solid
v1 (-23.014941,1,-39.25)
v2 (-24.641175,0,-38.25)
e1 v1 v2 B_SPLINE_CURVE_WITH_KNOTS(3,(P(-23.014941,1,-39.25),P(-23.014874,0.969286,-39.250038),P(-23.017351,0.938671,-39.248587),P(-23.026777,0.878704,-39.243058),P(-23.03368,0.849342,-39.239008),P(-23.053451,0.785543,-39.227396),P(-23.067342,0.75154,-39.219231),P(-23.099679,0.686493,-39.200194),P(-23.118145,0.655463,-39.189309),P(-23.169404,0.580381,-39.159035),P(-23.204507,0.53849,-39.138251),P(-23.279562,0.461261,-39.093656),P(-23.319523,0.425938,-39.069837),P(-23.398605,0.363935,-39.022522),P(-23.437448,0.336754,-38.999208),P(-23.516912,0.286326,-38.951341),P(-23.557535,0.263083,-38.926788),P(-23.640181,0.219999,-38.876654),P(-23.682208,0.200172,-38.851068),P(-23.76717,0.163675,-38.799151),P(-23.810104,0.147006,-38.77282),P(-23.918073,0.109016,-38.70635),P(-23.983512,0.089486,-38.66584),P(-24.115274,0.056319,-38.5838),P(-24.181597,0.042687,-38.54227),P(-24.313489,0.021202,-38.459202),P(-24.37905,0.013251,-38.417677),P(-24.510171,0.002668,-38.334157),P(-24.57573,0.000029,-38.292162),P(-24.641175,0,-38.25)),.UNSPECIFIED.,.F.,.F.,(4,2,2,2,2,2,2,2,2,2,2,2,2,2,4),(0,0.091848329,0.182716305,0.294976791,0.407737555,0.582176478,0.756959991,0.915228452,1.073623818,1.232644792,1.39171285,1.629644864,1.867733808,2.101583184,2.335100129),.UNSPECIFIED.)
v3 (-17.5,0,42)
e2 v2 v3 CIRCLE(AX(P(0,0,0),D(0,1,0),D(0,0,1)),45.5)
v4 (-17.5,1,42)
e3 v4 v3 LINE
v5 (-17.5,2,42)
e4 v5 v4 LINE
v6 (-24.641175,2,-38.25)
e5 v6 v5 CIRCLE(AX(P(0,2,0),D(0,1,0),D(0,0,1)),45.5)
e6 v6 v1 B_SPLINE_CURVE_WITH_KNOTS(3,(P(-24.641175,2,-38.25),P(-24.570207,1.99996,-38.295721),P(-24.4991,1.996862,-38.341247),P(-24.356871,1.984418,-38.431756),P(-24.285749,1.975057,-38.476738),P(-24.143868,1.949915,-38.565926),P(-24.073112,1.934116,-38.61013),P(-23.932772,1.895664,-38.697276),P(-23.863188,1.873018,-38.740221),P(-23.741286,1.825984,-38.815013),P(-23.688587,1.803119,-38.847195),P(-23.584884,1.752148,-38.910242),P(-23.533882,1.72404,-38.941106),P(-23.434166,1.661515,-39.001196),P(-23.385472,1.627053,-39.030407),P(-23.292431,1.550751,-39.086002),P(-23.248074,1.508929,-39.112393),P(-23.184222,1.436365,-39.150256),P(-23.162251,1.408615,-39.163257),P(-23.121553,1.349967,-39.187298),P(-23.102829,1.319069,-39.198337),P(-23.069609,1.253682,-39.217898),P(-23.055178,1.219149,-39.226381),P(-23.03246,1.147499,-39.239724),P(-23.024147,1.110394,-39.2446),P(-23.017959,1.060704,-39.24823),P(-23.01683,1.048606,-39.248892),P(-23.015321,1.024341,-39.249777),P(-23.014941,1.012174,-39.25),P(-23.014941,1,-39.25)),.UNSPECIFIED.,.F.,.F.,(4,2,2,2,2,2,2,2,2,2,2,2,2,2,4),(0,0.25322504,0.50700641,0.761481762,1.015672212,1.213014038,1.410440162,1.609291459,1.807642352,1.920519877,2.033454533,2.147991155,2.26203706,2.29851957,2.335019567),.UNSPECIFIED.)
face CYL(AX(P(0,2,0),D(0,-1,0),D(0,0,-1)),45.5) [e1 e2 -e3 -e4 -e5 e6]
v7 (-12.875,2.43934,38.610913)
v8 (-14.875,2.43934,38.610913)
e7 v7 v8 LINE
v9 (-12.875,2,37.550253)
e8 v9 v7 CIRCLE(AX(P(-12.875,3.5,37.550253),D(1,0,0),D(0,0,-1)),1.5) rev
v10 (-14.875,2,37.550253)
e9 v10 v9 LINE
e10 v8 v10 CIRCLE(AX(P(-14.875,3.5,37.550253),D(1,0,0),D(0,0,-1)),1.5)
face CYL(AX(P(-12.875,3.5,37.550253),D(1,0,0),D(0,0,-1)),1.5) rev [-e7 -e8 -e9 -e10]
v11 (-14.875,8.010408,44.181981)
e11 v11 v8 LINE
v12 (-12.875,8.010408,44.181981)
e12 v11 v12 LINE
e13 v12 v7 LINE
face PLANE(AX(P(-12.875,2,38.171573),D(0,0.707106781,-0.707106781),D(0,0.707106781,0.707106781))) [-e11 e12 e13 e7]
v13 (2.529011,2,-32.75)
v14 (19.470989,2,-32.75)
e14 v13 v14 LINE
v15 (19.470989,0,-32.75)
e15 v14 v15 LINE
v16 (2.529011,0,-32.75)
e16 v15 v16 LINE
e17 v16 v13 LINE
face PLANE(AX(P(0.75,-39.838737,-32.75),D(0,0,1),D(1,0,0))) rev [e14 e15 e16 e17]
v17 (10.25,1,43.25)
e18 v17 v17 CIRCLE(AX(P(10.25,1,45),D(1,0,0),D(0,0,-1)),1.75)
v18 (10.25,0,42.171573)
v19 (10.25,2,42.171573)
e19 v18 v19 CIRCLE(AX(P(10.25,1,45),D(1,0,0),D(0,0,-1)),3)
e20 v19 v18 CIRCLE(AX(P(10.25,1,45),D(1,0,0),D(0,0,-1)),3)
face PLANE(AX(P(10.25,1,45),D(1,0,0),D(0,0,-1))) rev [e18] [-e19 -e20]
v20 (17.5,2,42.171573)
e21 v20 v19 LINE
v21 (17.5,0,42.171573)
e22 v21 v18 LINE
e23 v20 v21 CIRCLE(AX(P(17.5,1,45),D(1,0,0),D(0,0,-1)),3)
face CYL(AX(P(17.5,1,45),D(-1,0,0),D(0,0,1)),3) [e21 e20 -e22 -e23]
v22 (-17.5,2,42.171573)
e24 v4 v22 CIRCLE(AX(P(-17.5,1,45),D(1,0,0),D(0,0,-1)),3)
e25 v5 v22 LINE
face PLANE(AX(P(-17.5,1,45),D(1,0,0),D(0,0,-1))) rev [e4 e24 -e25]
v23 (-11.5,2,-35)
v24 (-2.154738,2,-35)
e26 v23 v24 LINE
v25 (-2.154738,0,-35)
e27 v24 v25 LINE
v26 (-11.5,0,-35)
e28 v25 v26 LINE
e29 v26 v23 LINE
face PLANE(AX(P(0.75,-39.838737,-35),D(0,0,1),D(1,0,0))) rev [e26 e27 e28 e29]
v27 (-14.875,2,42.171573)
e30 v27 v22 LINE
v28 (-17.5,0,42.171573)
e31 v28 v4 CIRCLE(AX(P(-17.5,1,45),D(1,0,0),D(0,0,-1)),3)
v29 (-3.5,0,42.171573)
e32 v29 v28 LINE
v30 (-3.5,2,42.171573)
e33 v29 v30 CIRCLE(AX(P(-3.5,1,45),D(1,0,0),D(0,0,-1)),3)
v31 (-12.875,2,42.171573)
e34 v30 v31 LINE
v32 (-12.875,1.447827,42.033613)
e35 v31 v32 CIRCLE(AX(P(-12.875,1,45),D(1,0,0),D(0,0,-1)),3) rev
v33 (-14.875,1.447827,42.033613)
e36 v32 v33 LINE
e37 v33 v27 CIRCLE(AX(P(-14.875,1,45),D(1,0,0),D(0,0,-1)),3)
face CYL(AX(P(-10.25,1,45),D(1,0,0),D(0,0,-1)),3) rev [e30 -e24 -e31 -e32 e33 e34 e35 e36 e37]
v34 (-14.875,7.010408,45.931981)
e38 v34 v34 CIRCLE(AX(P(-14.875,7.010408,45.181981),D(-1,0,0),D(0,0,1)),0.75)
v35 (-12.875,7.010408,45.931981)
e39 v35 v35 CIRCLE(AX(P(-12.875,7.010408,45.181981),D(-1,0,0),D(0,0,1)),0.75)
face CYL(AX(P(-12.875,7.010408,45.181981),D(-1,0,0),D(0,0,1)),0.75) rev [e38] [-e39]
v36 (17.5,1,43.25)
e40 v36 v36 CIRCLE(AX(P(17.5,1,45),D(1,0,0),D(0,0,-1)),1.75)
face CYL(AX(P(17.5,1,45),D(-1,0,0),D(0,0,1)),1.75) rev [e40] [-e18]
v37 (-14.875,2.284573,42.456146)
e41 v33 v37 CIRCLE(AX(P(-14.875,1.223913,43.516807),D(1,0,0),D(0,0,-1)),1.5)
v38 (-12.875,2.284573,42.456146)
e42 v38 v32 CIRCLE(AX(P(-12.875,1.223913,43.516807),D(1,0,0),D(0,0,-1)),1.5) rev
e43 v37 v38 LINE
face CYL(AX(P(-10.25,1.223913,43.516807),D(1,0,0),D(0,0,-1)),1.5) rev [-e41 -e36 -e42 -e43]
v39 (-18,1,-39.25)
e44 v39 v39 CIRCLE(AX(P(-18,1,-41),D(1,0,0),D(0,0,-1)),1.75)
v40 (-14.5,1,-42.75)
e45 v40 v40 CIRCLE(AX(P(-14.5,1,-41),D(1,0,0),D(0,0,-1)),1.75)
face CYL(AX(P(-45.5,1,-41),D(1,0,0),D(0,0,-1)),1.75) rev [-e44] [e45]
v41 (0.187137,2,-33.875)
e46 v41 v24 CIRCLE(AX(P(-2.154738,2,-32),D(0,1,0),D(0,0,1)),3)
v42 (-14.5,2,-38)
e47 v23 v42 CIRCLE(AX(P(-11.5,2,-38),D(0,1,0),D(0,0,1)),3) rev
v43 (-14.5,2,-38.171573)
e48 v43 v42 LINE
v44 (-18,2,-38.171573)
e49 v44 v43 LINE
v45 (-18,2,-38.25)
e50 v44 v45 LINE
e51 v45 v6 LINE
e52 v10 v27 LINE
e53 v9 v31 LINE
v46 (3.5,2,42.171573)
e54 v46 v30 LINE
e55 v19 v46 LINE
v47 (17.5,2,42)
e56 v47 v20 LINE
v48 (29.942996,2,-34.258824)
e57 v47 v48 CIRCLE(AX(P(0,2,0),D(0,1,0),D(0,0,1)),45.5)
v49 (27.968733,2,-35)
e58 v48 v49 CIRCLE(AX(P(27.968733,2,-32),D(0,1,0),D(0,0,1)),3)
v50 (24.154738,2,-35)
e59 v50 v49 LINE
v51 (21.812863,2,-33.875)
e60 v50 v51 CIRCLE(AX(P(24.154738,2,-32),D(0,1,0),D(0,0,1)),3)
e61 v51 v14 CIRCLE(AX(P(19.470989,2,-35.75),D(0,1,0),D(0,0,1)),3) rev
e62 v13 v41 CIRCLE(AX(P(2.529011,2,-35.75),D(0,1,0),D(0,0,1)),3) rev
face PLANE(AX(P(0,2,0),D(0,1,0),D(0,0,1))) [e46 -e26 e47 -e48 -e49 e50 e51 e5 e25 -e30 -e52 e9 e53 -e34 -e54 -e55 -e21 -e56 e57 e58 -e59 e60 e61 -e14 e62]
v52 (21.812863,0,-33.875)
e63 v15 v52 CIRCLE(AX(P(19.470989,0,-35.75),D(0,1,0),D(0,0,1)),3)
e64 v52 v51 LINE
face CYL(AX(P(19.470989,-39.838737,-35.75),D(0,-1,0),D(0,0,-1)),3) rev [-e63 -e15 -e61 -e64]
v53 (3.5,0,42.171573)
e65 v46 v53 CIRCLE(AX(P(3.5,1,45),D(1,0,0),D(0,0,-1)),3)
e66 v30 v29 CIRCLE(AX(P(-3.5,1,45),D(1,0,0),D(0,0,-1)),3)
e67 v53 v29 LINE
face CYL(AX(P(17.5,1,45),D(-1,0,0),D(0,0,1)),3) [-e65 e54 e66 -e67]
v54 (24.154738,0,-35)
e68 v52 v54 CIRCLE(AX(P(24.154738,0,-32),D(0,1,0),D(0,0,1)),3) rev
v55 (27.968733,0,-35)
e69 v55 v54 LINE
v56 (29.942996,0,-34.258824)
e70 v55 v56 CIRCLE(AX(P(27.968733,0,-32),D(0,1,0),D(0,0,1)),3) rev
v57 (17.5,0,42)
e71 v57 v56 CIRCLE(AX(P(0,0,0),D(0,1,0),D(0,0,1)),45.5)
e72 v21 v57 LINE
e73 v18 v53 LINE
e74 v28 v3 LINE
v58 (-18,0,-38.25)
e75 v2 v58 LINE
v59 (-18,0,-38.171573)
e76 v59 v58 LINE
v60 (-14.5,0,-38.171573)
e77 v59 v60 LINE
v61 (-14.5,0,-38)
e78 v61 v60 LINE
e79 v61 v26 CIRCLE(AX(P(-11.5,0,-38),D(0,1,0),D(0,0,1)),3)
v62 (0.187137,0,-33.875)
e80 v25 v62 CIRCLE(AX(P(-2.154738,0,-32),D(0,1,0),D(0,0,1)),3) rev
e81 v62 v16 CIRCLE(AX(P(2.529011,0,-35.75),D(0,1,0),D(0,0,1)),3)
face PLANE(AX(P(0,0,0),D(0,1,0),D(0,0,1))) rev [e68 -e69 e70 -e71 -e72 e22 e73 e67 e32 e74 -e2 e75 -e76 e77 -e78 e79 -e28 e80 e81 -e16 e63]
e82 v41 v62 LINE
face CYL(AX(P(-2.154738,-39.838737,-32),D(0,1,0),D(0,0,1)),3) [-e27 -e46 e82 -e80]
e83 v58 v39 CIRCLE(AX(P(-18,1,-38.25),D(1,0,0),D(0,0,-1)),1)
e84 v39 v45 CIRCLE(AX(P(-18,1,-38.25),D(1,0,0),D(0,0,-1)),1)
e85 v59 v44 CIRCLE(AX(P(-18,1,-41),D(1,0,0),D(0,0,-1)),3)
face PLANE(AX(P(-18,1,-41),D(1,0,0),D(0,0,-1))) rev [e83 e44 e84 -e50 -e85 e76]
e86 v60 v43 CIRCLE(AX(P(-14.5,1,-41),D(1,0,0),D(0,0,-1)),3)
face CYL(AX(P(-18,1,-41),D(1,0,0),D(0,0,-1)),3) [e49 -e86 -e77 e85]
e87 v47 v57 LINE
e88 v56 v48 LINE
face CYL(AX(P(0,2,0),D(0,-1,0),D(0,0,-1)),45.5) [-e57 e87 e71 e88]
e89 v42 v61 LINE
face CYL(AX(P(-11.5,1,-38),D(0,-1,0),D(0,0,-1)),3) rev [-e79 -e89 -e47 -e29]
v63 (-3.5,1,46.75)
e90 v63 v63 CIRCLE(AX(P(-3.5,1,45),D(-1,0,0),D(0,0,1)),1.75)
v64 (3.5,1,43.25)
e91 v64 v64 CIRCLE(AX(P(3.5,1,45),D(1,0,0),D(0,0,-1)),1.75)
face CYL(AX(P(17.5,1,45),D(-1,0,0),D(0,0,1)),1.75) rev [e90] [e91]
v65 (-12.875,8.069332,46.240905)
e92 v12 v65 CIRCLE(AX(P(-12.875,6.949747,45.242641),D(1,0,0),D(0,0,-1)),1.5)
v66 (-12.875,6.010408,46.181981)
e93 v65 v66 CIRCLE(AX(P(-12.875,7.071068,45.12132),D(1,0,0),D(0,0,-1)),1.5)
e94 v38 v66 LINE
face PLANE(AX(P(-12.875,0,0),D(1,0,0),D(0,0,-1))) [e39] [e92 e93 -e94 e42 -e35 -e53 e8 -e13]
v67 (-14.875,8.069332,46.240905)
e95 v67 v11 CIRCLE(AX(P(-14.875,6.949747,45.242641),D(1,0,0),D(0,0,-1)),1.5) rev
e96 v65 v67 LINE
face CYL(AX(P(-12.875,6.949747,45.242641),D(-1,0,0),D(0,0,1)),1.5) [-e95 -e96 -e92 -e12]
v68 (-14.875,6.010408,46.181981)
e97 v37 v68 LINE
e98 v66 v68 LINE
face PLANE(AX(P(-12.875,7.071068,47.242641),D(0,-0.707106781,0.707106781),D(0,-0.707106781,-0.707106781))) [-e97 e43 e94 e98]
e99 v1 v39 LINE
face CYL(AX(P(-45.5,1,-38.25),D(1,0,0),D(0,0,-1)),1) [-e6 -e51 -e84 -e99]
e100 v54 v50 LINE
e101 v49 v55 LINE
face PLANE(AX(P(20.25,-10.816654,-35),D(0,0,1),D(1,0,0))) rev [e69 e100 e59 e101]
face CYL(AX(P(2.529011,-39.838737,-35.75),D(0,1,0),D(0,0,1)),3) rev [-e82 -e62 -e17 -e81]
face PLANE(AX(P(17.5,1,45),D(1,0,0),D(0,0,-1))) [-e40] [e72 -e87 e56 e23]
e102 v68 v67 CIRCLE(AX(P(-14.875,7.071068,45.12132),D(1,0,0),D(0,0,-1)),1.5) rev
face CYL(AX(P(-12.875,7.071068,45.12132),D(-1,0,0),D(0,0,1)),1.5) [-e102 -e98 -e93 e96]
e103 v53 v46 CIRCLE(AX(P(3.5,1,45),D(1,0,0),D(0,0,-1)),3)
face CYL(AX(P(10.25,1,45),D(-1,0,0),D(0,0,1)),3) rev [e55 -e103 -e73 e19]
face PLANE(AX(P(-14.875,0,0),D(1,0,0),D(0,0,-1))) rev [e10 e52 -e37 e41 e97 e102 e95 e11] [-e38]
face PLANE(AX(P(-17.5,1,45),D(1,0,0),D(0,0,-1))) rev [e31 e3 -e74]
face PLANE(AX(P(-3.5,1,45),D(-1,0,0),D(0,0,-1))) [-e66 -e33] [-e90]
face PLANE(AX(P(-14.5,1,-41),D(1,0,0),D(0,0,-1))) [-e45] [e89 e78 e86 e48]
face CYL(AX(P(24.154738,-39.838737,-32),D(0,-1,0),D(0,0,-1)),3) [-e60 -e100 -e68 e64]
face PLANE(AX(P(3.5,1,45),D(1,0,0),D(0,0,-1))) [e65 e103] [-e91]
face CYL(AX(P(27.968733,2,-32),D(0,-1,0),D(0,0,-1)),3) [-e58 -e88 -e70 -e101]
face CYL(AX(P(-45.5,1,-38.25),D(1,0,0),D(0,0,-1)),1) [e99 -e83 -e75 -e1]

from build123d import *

# Parameters (mm, degrees)
BOSS_EXTRUDE1_DEPTH            = 2
BOSS_EXTRUDE2_DEPTH            = 17.5
BOSS_EXTRUDE2_DEPTH_BACK       = 17.5
SKETCH2_R                      = 1.7500000000000036
SKETCH3_R                      = 2.999999999999994
CUT_EXTRUDE1_DEPTH             = 6.75
CUT_EXTRUDE2_DEPTH             = 2
BOSS_EXTRUDE4_DEPTH            = 3
BOSS_EXTRUDE4_DEPTH_BACK       = 0.5
SKETCH6_R                      = 1.7500000000000036
CUT_EXTRUDE3_DEPTH             = 77.9415362466854
FILLET1_R                      = 1
SKETCH7_W                      = 9
SKETCH7_H                      = 6
CUT_EXTRUDE4_DEPTH             = 2
FILLET2_R                      = 3
FILLET3_R                      = 3
CUT_EXTRUDE5_REACH             = 78.455
SKETCH10_R                     = 2.999999999999994
CUT_EXTRUDE5_DIRECTION_2_REACH = 78.455
BOSS_EXTRUDE6_DEPTH            = 1
BOSS_EXTRUDE6_DEPTH_BACK       = 1
SKETCH11_R                     = 0.7499999999999987
FILLET5_R                      = 1.5


# Some blends are built 0.0001 mm under size
with BuildPart() as part:
    # Sketch1 → Boss-Extrude1 (new body)
    with BuildSketch(Plane(origin=(0, 0, 0), x_dir=(1, 0, 0), z_dir=(0, 1, 0))):
        with BuildLine():
            Line((-17.499999999999993, -42), (17.499999999999993, -42))
            ThreePointArc((17.499999999999993, -42), (45.5, 1.01e-14), (17.499999999999975, 42.00000000000001))
            Line((17.499999999999975, 42.00000000000001), (-17.499999999999975, 42.00000000000001))
            ThreePointArc((-17.499999999999975, 42.00000000000001), (-45.5, 5.57e-15), (-17.499999999999993, -42))
        make_face()
    extrude(amount=BOSS_EXTRUDE1_DEPTH)

    # Sketch2 → Boss-Extrude2 (add, two sides: drawn at the far end of the back side and taken through both)
    with BuildSketch(Plane(origin=(0, 0, 0), x_dir=(0, 0, -1), z_dir=(1, 0, 0)).offset(-BOSS_EXTRUDE2_DEPTH_BACK)):
        with BuildLine():
            Line((-42, 0), (-42.171572875253815, 0))
            ThreePointArc((-42.171572875253815, 0), (-48.00000000000001, 1.0000000000000004), (-42.171572875253815, 2))
            Line((-42.171572875253815, 2), (-42, 2))
            Line((-42, 2), (-42, 1))
            Line((-42, 1), (-42, 0))
        make_face()
        with Locations((-45.00000000000001, 1)):
            Circle(SKETCH2_R, mode=Mode.SUBTRACT)
    extrude(amount=BOSS_EXTRUDE2_DEPTH + BOSS_EXTRUDE2_DEPTH_BACK)

    # Sketch3 → Cut-Extrude1 (cut)
    with BuildSketch(Plane(origin=(3.5, 0, 0), x_dir=(0, 0, -1), z_dir=(1, 0, 0))):
        with Locations((-45.00000000000001, 1)):
            Circle(SKETCH3_R)
    cut_extrude1 = extrude(amount=CUT_EXTRUDE1_DEPTH, mode=Mode.SUBTRACT)

    # Mirror1: Cut-Extrude1 across plane
    add(cut_extrude1.mirror(Plane(origin=(0, 0, 0), x_dir=(0, 0, 1), z_dir=(1, 0, 0))), mode=Mode.SUBTRACT)

    # Sketch4 → Cut-Extrude2 (cut)
    with BuildSketch(Plane(origin=(0, 2, 0), x_dir=(1, 0, 0), z_dir=(0, 1, 0))):
        Polygon((0.7499999999999764, 42.00000000000001), (21.249999999999982, 42.00000000000001), (21.24999999999998, 32.75000000000001), (0.7499999999999775, 32.75000000000001), (0.7499999999999781, 35.00000000000001), (-17.50000000000002, 35.00000000000001), (-17.50000000000002, 42.00000000000001), align=None)
    extrude(amount=-CUT_EXTRUDE2_DEPTH, mode=Mode.SUBTRACT)

    # Sketch5 → Boss-Extrude4 (add, two sides: drawn at the far end of the back side and taken through both)
    with BuildSketch(Plane(origin=(-17.50000000000002, 0, 0), x_dir=(0, 0, -1), z_dir=(1, 0, 0)).offset(-BOSS_EXTRUDE4_DEPTH_BACK)):
        with BuildLine():
            Line((35.00000000000001, 1), (35.00000000000001, 2))
            Line((35.00000000000001, 2), (38.171572875253815, 2))
            ThreePointArc((38.171572875253815, 2), (44.00000000000001, 1), (38.171572875253815, 0))
            Line((38.171572875253815, 0), (35.00000000000001, 0))
            Line((35.00000000000001, 0), (35.00000000000001, 1))
        make_face()
    extrude(amount=BOSS_EXTRUDE4_DEPTH + BOSS_EXTRUDE4_DEPTH_BACK)

    # Sketch6 → Cut-Extrude3 (cut, through all)
    with BuildSketch(Plane(origin=(-14.500000000000023, 0, 0), x_dir=(0, 0, -1), z_dir=(1, 0, 0))):
        with Locations((41.00000000000001, 1)):
            Circle(SKETCH6_R)
    extrude(amount=-CUT_EXTRUDE3_DEPTH, mode=Mode.SUBTRACT)

    # Fillet1
    fillet1_edges = [part.edges().sort_by_distance(p)[0] for p in [
        (-20.23555777714238, 0, -39.563859338365496),
        (-20.23555777714238, 2, -39.563859338365496),
    ]]
    fillet(fillet1_edges, radius=FILLET1_R - 0.0001)  # a hair under: the kernel refuses the full size

    # Sketch7 → Cut-Extrude4 (cut)
    with BuildSketch(Plane(origin=(0, 2, 0), x_dir=(1, 0, 0), z_dir=(0, 1, 0))):
        with Locations((24.749999999999975, 38.00000000000001)):
            Rectangle(SKETCH7_W, SKETCH7_H)
    extrude(amount=-CUT_EXTRUDE4_DEPTH, mode=Mode.SUBTRACT)

    # Fillet2
    # the kernel refuses this fillet: 3 mm, written as the material it adds along each edge
    with BuildSketch(Plane(origin=(-14.500000000000021, 0, -35.00000000000001), x_dir=(0, 0, -1), z_dir=(0, 1, 0))) as fillet2_piece_1:
        with BuildLine():
            CenterArc((FILLET2_R, -FILLET2_R), FILLET2_R, 90, 90)
            Line((0, -FILLET2_R), (0, 0))
            Line((0, 0), (FILLET2_R, 0))
        make_face()
    extrude(amount=2)
    # the kernel refuses this fillet: 3 mm, written as the material it takes off along each edge
    with BuildSketch(Plane(origin=(29.07318352021326, 4.856917413714078, -35.00000000000001), x_dir=(-1, 0, 0), z_dir=(0, -1, 0))) as fillet2_2_piece_1:
        with BuildLine():
            CenterArc((1.1044509783192602, -3), FILLET2_R, 90, 41.154201960072044)
            ThreePointArc((-0.8698124952261921, -0.7411764705882291), (-0.43723324041952694, -0.3678573776648406), (0, 0))
            Line((0, 0), (1.1044509783192602, 0))
        make_face()
    extrude(amount=7.7138348274281565, mode=Mode.SUBTRACT)
    with BuildSketch(Plane(origin=(21.24999999999998, -7.261843774138903, -35.00000000000001), x_dir=(0, 0, 1), z_dir=(0, 1, 0))) as fillet2_2_piece_2:
        with BuildLine():
            CenterArc((3, 2.904737509655561), FILLET2_R, 180, 75.52248781407008)
            Line((0, 2.904737509655561), (0, 0))
            Line((0, 0), (2.25, 0))
        make_face()
    extrude(amount=16.523687548277806, mode=Mode.SUBTRACT)
    with BuildSketch(Plane(origin=(0.7499999999999781, 9.261843774138908, -35.00000000000001), x_dir=(-1, 0, 0), z_dir=(0, -1, 0))) as fillet2_2_piece_3:
        with BuildLine():
            CenterArc((2.9047375096555634, -3), FILLET2_R, 90, 75.5224878140701)
            Line((7.8e-16, -2.25), (0, 0))
            Line((0, 0), (2.9047375096555634, 0))
        make_face()
    extrude(amount=16.523687548277817, mode=Mode.SUBTRACT)

    # Fillet3
    fillet3_edges = [part.edges().sort_by_distance(p)[0] for p in [
        (21.24999999999998, 1, -32.75000000000001),
        (0.7499999999999775, 1, -32.75000000000001),
    ]]
    fillet(fillet3_edges, radius=FILLET3_R)

    # Cut-Extrude5: up to this face of the body (flat: up to its plane)
    cut_extrude5_end = Plane(part.part.faces().sort_by_distance((-10.25, 1, 42.084852814))[0])
    # Sketch10 → Cut-Extrude5 (cut, up to the picked face)
    with BuildSketch(Plane.ZY.offset(13.874999999999995), mode=Mode.PRIVATE) as cut_extrude5_sk1:
        with Locations((45.00000000000001, 1)):
            Circle(SKETCH10_R)
    cut_extrude5_tool1 = split(extrude(cut_extrude5_sk1.sketch, amount=-CUT_EXTRUDE5_REACH, mode=Mode.PRIVATE), bisect_by=cut_extrude5_end, keep=Keep.BOTH, mode=Mode.PRIVATE)
    add(cut_extrude5_tool1.solids().sort_by(Axis((-13.875, 1, 45), (1, 0, 0)))[0], mode=Mode.SUBTRACT)

    # Cut-Extrude5 direction 2: up to this face of the body (flat: up to its plane)
    cut_extrude5_direction_2_end = Plane(part.part.faces().sort_by_distance((-17.5, 1.915147186, 42.085786438))[0])
    # Sketch10 → Cut-Extrude5 direction 2 (cut, up to the picked face)
    with BuildSketch(Plane.ZY.offset(13.874999999999995), mode=Mode.PRIVATE) as cut_extrude5_direction_2_sk1:
        with Locations((45.00000000000001, 1)):
            Circle(SKETCH10_R)
    cut_extrude5_direction_2_tool1 = split(extrude(cut_extrude5_direction_2_sk1.sketch, amount=CUT_EXTRUDE5_DIRECTION_2_REACH, mode=Mode.PRIVATE), bisect_by=cut_extrude5_direction_2_end, keep=Keep.BOTH, mode=Mode.PRIVATE)
    add(cut_extrude5_direction_2_tool1.solids().sort_by(Axis((-13.875, 1, 45), (-1, 0, 0)))[0], mode=Mode.SUBTRACT)

    # Sketch11 → Boss-Extrude6 (add, two sides: drawn at the far end of the back side and taken through both)
    with BuildSketch(Plane.ZY.offset(13.874999999999995).offset(-BOSS_EXTRUDE6_DEPTH_BACK)):
        Polygon((38.171572875253815, 2), (45.24264068711927, 9.07106781186549), (47.242640687119284, 7.071067811865485), (42.171572875253815, 2), align=None)
        with Locations((45.18198051533946, 7.010407640085664)):
            Circle(SKETCH11_R, mode=Mode.SUBTRACT)
    extrude(amount=BOSS_EXTRUDE6_DEPTH + BOSS_EXTRUDE6_DEPTH_BACK)

    # Fillet5
    # the kernel refuses this fillet: 1.5 mm, written as the material it adds along each edge
    with BuildSketch(Plane(origin=(-12.874999999999995, 2, 42.171572875253815), x_dir=(0, -0.9701770324837726, -0.24239745386653885), z_dir=(-1, 0, 0))) as fillet5_piece_1:
        with BuildLine():
            CenterArc((0.42686024849732124, 1.4932362441747078), FILLET5_R, 239.02808334302642, 36.41505394843642)
            Line((-0.3450665643766781, 0.2071067811865567), (0, 0))
            ThreePointArc((0, 0), (0.284573498998202, -0.01352751165058759), (0.5691469979964033, 2e-17))
        make_face()
    extrude(amount=2)
    with BuildSketch(Plane(origin=(-12.874999999999995, 2, 38.171572875253815), x_dir=(0, 0, -1), z_dir=(-1, 0, 0))) as fillet5_piece_2:
        with BuildLine():
            CenterArc((FILLET5_R * 0.414213562373, -FILLET5_R), FILLET5_R, 90, 45.000000000000085)
            Line((-FILLET5_R * 0.292893218813, -FILLET5_R * 0.292893218813), (0, 0))
            Line((0, 0), (FILLET5_R * 0.414213562373, 0))
        make_face()
    extrude(amount=2)
    # the kernel refuses this fillet: 1.5 mm, written as the material it takes off along each edge
    with BuildSketch(Plane(origin=(-18.625000000000014, 7.071067811865485, 47.242640687119284), x_dir=(0, 0.7071067811865455, -0.7071067811865496), z_dir=(1, 0, 0))) as fillet5_2_piece_1:
        with BuildLine():
            CenterArc((FILLET5_R, -FILLET5_R), FILLET5_R, 89.9999999999999, 90.00000000000017)
            Line((4.98e-15, -FILLET5_R), (0, 0))
            Line((0, 0), (FILLET5_R, 2e-17))
        make_face()
    extrude(amount=9.500000000000039, mode=Mode.SUBTRACT)
    with BuildSketch(Plane(origin=(-18.62499999999999, 9.07106781186549, 45.24264068711927), x_dir=(0, -0.7071067811865499, -0.7071067811865451), z_dir=(1, 0, 0))) as fillet5_2_piece_2:
        with BuildLine():
            CenterArc((FILLET5_R, -FILLET5_R), FILLET5_R, 90.0000000000001, 89.99999999999984)
            Line((1.28e-15, -FILLET5_R), (0, 0))
            Line((0, 0), (FILLET5_R, 9e-17))
        make_face()
    extrude(amount=9.49999999999999, mode=Mode.SUBTRACT)


solid = part.part
